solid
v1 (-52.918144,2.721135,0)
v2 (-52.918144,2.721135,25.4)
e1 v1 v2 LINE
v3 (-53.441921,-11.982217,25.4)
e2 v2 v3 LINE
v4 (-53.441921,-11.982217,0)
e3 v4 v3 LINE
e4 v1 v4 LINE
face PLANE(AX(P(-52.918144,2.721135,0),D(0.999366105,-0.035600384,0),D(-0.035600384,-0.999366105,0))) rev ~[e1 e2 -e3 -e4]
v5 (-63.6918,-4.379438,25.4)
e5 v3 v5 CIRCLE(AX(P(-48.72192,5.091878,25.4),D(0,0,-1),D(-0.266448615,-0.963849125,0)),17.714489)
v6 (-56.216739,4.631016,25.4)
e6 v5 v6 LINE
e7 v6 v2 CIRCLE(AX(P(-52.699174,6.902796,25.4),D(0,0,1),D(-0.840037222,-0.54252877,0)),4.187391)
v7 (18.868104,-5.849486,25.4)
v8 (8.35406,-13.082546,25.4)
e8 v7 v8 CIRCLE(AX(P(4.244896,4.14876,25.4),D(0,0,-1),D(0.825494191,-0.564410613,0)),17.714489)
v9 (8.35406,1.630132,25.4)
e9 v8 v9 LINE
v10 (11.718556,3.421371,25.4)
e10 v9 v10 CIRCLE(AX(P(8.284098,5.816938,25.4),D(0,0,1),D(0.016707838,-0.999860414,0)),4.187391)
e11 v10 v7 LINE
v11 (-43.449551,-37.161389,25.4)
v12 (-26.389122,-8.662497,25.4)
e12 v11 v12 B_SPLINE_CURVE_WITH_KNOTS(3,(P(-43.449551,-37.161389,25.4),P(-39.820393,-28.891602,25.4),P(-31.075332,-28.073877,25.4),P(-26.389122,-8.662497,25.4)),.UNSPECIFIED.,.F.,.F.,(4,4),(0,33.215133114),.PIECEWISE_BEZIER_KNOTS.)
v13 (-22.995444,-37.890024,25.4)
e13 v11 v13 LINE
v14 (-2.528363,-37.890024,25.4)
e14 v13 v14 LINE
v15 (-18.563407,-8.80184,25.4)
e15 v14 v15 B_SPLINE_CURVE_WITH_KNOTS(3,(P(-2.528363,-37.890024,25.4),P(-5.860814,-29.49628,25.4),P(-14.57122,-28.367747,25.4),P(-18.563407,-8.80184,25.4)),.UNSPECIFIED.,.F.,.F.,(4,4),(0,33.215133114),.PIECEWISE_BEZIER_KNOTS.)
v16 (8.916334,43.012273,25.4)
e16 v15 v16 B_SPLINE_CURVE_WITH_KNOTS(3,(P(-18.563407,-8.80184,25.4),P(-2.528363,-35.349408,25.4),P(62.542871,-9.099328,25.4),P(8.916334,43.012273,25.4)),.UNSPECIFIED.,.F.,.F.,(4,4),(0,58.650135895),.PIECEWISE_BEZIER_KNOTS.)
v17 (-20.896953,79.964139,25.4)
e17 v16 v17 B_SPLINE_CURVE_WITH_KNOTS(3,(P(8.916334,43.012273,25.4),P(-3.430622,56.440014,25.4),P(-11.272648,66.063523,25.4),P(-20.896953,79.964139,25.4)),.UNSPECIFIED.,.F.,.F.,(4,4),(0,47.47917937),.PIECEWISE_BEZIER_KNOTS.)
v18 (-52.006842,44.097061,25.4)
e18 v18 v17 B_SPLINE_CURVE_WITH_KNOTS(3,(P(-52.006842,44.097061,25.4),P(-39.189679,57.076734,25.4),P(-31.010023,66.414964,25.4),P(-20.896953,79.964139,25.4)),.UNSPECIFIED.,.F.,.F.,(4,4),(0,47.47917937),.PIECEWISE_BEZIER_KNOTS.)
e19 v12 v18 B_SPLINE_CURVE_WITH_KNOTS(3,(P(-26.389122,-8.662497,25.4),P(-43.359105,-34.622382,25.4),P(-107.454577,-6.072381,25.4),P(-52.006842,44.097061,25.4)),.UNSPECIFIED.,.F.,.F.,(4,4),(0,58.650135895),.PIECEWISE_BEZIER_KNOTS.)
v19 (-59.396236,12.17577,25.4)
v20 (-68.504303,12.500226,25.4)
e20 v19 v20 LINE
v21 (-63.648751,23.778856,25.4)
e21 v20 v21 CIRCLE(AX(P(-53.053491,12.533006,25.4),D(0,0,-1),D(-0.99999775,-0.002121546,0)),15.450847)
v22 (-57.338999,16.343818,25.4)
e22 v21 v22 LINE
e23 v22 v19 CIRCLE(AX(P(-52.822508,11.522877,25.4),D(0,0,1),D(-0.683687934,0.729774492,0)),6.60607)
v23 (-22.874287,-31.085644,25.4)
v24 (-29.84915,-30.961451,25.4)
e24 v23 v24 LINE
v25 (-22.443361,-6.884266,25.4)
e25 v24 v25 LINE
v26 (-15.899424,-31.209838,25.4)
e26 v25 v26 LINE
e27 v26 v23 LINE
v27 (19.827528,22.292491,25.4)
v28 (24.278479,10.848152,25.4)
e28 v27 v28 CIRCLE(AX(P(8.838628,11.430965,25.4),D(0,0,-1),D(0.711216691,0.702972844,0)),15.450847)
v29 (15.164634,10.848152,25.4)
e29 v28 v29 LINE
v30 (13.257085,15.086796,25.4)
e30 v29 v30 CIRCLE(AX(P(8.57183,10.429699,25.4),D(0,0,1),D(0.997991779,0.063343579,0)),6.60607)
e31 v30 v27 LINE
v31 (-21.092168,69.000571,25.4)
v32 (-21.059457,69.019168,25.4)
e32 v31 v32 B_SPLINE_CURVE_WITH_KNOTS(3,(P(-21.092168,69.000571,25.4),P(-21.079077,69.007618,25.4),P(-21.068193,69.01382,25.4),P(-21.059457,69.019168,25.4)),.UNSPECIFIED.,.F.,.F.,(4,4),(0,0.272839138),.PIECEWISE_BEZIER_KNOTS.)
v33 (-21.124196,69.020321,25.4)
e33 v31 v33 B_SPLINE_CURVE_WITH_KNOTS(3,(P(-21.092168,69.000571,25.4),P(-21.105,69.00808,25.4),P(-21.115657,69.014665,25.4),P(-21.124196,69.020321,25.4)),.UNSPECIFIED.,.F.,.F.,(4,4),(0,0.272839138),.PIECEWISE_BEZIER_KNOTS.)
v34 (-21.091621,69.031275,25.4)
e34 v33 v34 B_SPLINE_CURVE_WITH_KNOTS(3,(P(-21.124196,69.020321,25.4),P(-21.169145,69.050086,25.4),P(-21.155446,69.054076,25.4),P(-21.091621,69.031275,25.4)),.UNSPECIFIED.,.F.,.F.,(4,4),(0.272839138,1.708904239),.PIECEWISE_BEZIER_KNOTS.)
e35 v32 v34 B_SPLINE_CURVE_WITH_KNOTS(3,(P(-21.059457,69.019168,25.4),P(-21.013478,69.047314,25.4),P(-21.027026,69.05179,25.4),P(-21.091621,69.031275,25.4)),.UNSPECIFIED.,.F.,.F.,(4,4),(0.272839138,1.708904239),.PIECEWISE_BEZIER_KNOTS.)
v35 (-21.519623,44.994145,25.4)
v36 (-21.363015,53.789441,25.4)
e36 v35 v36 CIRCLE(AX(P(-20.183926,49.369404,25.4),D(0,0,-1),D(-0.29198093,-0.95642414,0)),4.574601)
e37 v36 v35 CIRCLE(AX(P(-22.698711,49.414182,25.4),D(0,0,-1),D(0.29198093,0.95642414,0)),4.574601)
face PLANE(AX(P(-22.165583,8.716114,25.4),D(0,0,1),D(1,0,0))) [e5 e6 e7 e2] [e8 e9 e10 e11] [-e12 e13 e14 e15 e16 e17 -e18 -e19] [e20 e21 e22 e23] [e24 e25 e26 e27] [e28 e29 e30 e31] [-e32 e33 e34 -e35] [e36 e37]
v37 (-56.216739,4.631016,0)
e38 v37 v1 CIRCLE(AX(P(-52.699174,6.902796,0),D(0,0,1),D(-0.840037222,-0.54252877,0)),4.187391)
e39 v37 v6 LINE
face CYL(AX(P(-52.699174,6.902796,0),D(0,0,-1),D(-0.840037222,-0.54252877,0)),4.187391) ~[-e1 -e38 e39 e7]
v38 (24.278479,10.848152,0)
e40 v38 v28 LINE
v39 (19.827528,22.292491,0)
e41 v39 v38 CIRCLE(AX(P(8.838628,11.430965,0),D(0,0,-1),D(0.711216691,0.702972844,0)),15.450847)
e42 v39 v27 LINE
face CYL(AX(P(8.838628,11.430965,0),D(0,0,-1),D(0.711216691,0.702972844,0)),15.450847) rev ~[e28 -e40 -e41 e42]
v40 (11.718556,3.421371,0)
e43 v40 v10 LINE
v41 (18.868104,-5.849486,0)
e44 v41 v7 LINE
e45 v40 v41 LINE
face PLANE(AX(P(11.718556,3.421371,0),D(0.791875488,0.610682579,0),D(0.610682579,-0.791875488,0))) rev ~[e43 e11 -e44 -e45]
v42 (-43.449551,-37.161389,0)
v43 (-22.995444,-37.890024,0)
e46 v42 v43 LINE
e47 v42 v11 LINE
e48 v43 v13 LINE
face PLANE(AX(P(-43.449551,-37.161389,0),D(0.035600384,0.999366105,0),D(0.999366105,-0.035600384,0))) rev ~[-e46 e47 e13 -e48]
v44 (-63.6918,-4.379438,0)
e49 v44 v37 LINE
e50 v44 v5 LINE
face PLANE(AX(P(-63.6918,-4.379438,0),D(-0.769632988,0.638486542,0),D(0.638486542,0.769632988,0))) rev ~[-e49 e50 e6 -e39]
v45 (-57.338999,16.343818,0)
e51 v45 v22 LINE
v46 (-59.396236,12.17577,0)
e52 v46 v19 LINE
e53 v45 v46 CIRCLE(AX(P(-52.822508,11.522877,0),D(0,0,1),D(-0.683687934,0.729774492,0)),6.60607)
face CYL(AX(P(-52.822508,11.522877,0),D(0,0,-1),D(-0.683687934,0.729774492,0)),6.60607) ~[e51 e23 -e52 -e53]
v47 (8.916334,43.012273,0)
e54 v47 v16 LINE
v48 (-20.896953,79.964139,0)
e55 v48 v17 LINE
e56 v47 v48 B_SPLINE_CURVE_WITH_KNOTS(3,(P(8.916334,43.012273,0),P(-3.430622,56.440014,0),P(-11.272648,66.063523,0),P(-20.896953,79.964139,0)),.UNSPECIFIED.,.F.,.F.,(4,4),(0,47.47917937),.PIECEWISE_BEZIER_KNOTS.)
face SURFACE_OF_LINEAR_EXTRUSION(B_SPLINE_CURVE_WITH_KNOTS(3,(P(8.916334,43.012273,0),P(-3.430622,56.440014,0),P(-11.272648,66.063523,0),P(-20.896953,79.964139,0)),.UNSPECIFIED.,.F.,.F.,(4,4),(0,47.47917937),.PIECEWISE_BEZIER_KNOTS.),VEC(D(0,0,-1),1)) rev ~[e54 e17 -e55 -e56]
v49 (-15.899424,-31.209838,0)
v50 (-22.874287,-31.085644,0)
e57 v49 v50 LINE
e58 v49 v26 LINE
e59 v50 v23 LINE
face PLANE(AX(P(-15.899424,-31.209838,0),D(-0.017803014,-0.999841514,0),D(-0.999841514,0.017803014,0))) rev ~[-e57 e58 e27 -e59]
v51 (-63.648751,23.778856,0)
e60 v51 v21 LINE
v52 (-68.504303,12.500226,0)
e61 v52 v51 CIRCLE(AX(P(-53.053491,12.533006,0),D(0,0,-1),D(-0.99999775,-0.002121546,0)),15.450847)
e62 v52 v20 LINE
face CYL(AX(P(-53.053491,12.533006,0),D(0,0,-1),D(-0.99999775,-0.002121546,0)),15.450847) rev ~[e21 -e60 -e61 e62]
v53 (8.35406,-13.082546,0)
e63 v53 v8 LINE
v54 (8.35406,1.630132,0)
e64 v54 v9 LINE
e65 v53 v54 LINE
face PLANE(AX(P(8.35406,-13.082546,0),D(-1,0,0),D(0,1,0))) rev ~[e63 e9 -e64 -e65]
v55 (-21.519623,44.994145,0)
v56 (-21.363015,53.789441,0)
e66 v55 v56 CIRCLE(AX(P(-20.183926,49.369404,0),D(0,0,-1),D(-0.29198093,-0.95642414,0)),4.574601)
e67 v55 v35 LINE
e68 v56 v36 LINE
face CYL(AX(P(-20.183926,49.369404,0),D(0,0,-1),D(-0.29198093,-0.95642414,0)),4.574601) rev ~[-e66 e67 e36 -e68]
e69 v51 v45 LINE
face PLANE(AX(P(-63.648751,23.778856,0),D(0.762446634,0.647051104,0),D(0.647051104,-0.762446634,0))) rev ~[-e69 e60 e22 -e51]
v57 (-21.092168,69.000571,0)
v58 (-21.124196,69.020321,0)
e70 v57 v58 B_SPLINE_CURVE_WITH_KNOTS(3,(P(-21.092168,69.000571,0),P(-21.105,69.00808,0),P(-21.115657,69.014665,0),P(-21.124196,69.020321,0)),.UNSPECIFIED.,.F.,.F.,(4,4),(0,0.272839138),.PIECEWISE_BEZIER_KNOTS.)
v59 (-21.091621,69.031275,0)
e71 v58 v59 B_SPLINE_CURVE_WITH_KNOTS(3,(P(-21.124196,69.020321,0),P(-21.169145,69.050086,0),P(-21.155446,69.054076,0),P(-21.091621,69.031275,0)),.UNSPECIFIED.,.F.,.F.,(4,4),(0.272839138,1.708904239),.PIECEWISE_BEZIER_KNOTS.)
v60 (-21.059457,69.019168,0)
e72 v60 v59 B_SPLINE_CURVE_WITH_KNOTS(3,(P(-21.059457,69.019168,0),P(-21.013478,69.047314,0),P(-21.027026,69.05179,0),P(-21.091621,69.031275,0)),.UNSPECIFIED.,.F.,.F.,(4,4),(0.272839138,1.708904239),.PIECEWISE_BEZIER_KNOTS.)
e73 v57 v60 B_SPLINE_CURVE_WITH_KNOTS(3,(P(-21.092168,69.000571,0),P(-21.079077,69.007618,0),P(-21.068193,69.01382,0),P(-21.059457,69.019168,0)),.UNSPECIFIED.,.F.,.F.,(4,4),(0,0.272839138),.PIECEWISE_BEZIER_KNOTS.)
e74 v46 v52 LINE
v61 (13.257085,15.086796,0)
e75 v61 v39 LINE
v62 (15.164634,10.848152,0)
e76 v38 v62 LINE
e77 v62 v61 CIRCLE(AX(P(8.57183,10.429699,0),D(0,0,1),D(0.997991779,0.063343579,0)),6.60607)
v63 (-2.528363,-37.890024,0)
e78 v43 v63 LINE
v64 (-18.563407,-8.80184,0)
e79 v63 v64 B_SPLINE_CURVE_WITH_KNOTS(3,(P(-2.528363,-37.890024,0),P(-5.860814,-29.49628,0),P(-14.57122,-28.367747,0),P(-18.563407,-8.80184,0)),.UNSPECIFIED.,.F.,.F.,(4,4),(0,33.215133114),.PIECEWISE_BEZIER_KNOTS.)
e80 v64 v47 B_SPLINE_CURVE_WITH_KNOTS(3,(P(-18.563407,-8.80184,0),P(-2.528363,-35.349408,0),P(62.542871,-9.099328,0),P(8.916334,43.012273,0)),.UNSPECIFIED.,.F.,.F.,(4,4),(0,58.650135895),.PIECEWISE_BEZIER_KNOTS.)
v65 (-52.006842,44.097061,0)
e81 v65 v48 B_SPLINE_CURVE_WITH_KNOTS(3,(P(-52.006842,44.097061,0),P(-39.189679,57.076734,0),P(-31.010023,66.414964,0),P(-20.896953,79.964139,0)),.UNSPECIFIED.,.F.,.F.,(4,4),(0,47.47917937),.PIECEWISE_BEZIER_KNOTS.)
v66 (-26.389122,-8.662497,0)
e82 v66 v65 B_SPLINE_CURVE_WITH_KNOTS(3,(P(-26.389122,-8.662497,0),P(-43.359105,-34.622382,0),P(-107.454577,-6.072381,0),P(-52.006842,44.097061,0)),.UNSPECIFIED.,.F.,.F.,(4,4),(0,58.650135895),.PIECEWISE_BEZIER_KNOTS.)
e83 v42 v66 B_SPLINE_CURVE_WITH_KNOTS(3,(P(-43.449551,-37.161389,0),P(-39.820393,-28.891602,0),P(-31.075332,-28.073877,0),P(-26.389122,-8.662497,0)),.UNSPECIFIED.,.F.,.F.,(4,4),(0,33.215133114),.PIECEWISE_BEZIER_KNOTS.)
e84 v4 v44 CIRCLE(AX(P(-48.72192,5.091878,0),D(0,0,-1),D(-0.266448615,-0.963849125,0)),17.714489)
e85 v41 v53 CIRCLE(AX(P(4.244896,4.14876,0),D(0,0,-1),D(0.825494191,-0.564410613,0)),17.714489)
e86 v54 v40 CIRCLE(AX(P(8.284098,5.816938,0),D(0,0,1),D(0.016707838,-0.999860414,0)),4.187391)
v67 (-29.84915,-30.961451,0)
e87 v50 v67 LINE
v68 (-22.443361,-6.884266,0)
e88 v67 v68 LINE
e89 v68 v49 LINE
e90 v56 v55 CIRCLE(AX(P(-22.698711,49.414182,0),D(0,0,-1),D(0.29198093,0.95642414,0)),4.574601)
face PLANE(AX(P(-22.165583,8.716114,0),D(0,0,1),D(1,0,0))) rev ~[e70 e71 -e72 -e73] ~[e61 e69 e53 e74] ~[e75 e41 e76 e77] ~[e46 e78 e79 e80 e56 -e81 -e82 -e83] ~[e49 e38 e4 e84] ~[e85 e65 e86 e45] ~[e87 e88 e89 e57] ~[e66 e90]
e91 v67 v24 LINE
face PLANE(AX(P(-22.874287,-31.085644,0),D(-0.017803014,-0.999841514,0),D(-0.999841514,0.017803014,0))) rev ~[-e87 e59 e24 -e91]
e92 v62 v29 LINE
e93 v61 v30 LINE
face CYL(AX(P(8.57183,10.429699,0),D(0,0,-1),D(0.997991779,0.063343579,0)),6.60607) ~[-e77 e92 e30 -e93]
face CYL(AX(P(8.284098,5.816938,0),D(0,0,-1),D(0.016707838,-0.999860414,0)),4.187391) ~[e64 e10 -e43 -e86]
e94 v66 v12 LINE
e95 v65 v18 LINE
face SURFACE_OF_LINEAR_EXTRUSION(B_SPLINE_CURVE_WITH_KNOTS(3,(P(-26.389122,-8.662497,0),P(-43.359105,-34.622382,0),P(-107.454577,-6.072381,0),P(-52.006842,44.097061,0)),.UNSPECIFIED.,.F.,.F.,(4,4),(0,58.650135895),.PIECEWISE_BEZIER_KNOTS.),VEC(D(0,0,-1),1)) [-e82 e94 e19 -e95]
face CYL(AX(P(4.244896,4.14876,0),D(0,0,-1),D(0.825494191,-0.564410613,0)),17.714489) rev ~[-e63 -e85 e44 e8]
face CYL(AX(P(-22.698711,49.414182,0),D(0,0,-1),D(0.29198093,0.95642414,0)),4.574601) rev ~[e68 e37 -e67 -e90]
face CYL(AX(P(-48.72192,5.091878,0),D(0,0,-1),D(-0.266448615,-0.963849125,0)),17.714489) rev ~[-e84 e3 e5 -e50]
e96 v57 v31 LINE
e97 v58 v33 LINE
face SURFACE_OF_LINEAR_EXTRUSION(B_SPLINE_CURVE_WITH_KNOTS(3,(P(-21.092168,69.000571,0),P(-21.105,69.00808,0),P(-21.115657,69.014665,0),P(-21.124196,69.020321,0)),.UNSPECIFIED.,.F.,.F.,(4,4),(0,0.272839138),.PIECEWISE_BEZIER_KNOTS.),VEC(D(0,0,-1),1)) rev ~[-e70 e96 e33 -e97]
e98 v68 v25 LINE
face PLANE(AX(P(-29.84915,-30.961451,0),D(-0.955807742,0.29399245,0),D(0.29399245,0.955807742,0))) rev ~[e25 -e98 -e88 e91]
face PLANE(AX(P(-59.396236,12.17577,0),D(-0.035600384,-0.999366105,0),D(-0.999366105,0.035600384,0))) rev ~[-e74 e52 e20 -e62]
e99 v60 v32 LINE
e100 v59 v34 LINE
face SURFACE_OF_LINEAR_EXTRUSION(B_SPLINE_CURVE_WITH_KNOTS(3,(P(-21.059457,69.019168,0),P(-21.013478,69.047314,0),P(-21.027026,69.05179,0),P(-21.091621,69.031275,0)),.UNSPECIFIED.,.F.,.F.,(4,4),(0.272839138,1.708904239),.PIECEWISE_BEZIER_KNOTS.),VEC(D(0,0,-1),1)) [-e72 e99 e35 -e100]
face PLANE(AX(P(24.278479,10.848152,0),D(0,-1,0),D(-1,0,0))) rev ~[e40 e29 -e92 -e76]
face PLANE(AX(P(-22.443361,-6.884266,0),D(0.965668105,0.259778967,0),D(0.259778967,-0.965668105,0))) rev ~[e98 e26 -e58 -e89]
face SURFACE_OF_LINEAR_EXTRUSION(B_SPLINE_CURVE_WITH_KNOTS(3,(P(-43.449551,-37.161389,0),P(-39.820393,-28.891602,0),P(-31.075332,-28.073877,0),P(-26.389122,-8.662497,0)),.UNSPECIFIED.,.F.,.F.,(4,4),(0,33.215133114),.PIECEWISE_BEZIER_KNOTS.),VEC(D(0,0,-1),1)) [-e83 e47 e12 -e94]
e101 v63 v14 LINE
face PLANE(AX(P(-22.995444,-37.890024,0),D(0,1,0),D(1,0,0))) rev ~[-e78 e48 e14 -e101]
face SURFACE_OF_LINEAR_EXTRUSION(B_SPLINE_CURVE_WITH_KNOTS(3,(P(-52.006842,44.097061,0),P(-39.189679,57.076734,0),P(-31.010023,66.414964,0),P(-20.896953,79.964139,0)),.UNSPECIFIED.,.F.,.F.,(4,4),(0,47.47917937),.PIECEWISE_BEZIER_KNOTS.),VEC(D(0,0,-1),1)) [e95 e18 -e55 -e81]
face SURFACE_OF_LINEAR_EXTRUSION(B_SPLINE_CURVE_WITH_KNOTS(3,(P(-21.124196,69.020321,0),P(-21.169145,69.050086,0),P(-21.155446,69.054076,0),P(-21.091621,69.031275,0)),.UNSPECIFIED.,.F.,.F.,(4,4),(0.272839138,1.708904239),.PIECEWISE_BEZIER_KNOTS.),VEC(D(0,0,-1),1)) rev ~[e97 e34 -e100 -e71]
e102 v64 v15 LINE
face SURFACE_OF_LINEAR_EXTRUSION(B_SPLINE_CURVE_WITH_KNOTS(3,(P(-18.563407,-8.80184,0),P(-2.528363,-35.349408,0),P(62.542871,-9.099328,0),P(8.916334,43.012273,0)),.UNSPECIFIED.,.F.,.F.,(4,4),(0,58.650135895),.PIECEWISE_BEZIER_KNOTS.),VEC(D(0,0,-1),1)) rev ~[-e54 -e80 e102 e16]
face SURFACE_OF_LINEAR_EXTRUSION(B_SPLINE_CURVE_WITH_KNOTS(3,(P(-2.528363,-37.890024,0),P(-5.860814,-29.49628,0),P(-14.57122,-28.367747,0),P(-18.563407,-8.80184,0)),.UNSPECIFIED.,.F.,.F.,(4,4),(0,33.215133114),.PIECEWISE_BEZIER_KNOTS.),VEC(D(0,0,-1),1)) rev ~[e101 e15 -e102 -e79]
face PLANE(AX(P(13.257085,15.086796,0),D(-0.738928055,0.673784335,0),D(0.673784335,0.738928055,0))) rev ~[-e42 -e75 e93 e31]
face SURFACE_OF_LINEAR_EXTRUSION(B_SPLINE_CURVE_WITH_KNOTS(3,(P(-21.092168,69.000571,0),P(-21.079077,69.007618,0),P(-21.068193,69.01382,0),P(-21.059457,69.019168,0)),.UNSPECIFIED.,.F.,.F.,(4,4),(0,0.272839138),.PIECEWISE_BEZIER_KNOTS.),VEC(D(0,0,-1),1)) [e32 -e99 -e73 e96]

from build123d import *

# Parameters (mm, degrees)
F0_W     = 4.7442697883
F0_H     = 1.9113573674
F0_W_2   = 4.7634891234
F0_H_2   = 1.468620263
F0_W_3   = 4.128358094
F0_H_3   = 1.4289282262
F1_DEPTH = 25.4


# Not quite as in the source:
# - a feature names something its author has since deleted; it is built from what else it names


with BuildPart() as f1:
    # F0 (on Top) → F1 (new body)
    with BuildSketch(Plane.XY):
        with BuildLine():
            Line((-22.9954444695, -37.8900244832), (-2.5283634938, -37.8900244832))
            add(Edge.make_bspline(
                [(-2.5283634938, -37.8900244832), (-5.8608135484, -29.4962804765), (-14.5712196827, -28.3677466214), (-18.5634065419, -8.8018402457)],
                knots=[0, 0, 0, 0, 33.2151331141, 33.2151331141, 33.2151331141, 33.2151331141], degree=3))
            add(Edge.make_bspline(
                [(-18.5634065419, -8.8018402457), (-2.5283634938, -35.3494078415), (62.5428706408, -9.0993279591), (8.9163342491, 43.0122725666)],
                knots=[0, 0, 0, 0, 58.6501358947, 58.6501358947, 58.6501358947, 58.6501358947], degree=3))
            add(Edge.make_bspline(
                [(8.9163342491, 43.0122725666), (-3.4306221642, 56.4400143921), (-11.2726483494, 66.0635232925), (-20.8969525993, 79.9641385674)],
                knots=[0, 0, 0, 0, 47.47917937, 47.47917937, 47.47917937, 47.47917937], degree=3))
            add(Edge.make_bspline(
                [(-52.0068416032, 44.0970606294), (-39.1896790872, 57.0767342864), (-31.0100233031, 66.4149637492), (-20.8969525993, 79.9641385674)],
                knots=[0, 0, 0, 0, 47.47917937, 47.47917937, 47.47917937, 47.47917937], degree=3))
            add(Edge.make_bspline(
                [(-26.3891224094, -8.6624968343), (-43.3591045439, -34.6223823726), (-107.454577438, -6.07238132), (-52.0068416032, 44.0970606294)],
                knots=[0, 0, 0, 0, 58.6501358947, 58.6501358947, 58.6501358947, 58.6501358947], degree=3))
            add(Edge.make_bspline(
                [(-43.4495514732, -37.1613885312), (-39.8203933268, -28.8916017766), (-31.0753324327, -28.0738771005), (-26.3891224094, -8.6624968343)],
                knots=[0, 0, 0, 0, 33.2151331141, 33.2151331141, 33.2151331141, 33.2151331141], degree=3))
            Line((-43.4495514732, -37.1613885312), (-22.9954444695, -37.8900244832))
        make_face()
        Polygon((-29.84915008, -30.9614511052), (-22.4433610347, -6.8842664576), (-15.8994235098, -31.2098376453), (-22.8742867949, -31.0856443752), align=None, mode=Mode.SUBTRACT)
        with BuildLine():
            add(Edge.make_bspline(
                [(-22.3207809169, 0), (-10.655029352, -32.6894562044), (59.6865899861, -11.1531224102), (7.7575119212, 41.9883653522)],
                knots=[0, 0, 0, 0, 51.6500389642, 51.6500389642, 51.6500389642, 51.6500389642], degree=3))
            add(Edge.make_bspline(
                [(-22.3207809169, 0), (-35.1428948343, -32.2534292936), (-104.6732232363, -8.2265585713), (-50.8852053371, 43.0325479438)],
                knots=[0, 0, 0, 0, 51.6500389642, 51.6500389642, 51.6500389642, 51.6500389642], degree=3))
            Line((-50.8852053371, 43.0325479438), (-20.973111277, 75.6869634445))
            Line((-20.973111277, 75.6869634445), (7.7575119212, 41.9883653522))
        make_face(mode=Mode.SUBTRACT)
        with BuildLine():
            add(Edge.make_bspline(
                [(-22.3207809169, 0), (-35.1428948343, -32.2534292936), (-104.6732232363, -8.2265585713), (-50.8852053371, 43.0325479438)],
                knots=[0, 0, 0, 0, 51.6500389642, 51.6500389642, 51.6500389642, 51.6500389642], degree=3))
            add(Edge.make_bspline(
                [(-22.3207809169, 0), (-10.655029352, -32.6894562044), (59.6865899861, -11.1531224102), (7.7575119212, 41.9883653522)],
                knots=[0, 0, 0, 0, 51.6500389642, 51.6500389642, 51.6500389642, 51.6500389642], degree=3))
            Line((7.7575119212, 41.9883653522), (-20.973111277, 75.6869634445))
            Line((-20.973111277, 75.6869634445), (-50.8852053371, 43.0325479438))
        make_face()
        with BuildLine():
            ThreePointArc((-53.4419212435, -11.9822170834), (-59.2752805035, -9.1359017891), (-63.691800004, -4.379438133))
            Line((-63.691800004, -4.379438133), (-56.2167386264, 4.6310161836))
            ThreePointArc((-56.2167386264, 4.6310161836), (-54.7973483092, 3.2789986514), (-52.9181442541, 2.7211345107))
            Line((-52.9181442541, 2.7211345107), (-53.4419212435, -11.9822170834))
        make_face(mode=Mode.SUBTRACT)
        with BuildLine():
            Line((-59.3962358793, 12.1757701265), (-68.5043031466, 12.5002264942))
            ThreePointArc((-68.5043031466, 12.5002264942), (-67.2450849294, 18.6426159936), (-63.6487509213, 23.7788559591))
            Line((-63.6487509213, 23.7788559591), (-57.3389988191, 16.3438184143))
            ThreePointArc((-57.3389988191, 16.3438184143), (-58.7463070002, 14.4467053449), (-59.3962358793, 12.1757701265))
        make_face(mode=Mode.SUBTRACT)
        with BuildLine():
            ThreePointArc((18.8681036234, -5.8494862169), (14.2850517957, -10.4457049841), (8.3540603518, -13.082546182))
            Line((8.3540603518, -13.082546182), (8.3540603518, 1.6301316991))
            ThreePointArc((8.3540603518, 1.6301316991), (10.2519333675, 2.1207418259), (11.7185562849, 3.4213714805))
            Line((11.7185562849, 3.4213714805), (18.8681036234, -5.8494862169))
        make_face(mode=Mode.SUBTRACT)
        with BuildLine():
            ThreePointArc((19.8275279254, 22.2924910486), (23.2387301192, 17.0314760444), (24.2784786969, 10.8481515199))
            Line((24.2784786969, 10.8481515199), (15.1646342129, 10.8481515199))
            ThreePointArc((15.1646342129, 10.8481515199), (14.5959634871, 13.1407849228), (13.2570853457, 15.0867961347))
            Line((13.2570853457, 15.0867961347), (19.8275279254, 22.2924910486))
        make_face(mode=Mode.SUBTRACT)
        with BuildLine():
            add(Edge.make_bspline(
                [(-21.124196495, 69.0203205478), (-22.2645987992, 68.6191021406), (-33.580908588, 63.0681711425), (-30.2861785142, 48.5103170354)],
                knots=[1.924853553, 1.924853553, 1.924853553, 1.924853553, 22.4584134886, 22.4584134886, 22.4584134886, 22.4584134886], degree=3))
            add(Edge.make_bspline(
                [(-21.124196495, 69.0203205478), (-21.1691445632, 69.0500857695), (-21.1554459369, 69.0540761805), (-21.0916213723, 69.0312749979)],
                knots=[0.2728391378, 0.2728391378, 0.2728391378, 0.2728391378, 1.7089042388, 1.7089042388, 1.7089042388, 1.7089042388], degree=3))
            add(Edge.make_bspline(
                [(-21.0594568815, 69.0191678049), (-21.0134776523, 69.04731399), (-21.027025535, 69.0517895479), (-21.0916213723, 69.0312749979)],
                knots=[0.2728391378, 0.2728391378, 0.2728391378, 0.2728391378, 1.7089042388, 1.7089042388, 1.7089042388, 1.7089042388], degree=3))
            add(Edge.make_bspline(
                [(-21.0594568815, 69.0191678049), (-19.9340610017, 68.5776049674), (-8.8225398383, 62.627327695), (-12.633446604, 48.1959953904)],
                knots=[1.924853553, 1.924853553, 1.924853553, 1.924853553, 22.4584134886, 22.4584134886, 22.4584134886, 22.4584134886], degree=3))
            add(Edge.make_bspline(
                [(-12.633446604, 48.1959953904), (-4.4782049954, 44.5908084512), (-1.012446126, 42.8227111697), (4.8599806614, 35.9290093184)],
                knots=[0, 0, 0, 0, 21.3658359252, 21.3658359252, 21.3658359252, 21.3658359252], degree=3))
            Line((4.8599806614, 35.9290093184), (8.7451650402, 35.4348045049))
            Line((8.7451650402, 35.4348045049), (12.5032669737, 31.2499941052))
            add(Edge.make_bspline(
                [(12.5032669737, 31.2499941052), (8.0707731529, 17.1092335792), (6.1978180893, 11.1496476457), (4.9289693125, -2.2719807457)],
                knots=[0, 0, 0, 0, 34.3670304648, 34.3670304648, 34.3670304648, 34.3670304648], degree=3))
            Line((4.9289693125, -2.2719807457), (-17.9089047015, -2.2719807457))
            Line((-17.9089047015, -2.2719807457), (-22.3005021556, 1.1388828675))
            Line((-22.3005021556, 1.1388828675), (-26.8107438558, -2.1134760598))
            Line((-26.8107438558, -2.1134760598), (-49.6341410648, -1.3004389641))
            add(Edge.make_bspline(
                [(-56.0102422262, 32.469934397), (-52.083974651, 18.1803391384), (-50.4243703941, 12.1578530338), (-49.6341410648, -1.3004389641)],
                knots=[0, 0, 0, 0, 34.3670304648, 34.3670304648, 34.3670304648, 34.3670304648], degree=3))
            Line((-56.0102422262, 32.469934397), (-52.105541674, 36.5183021942))
            Line((-52.105541674, 36.5183021942), (-48.2052262113, 36.8738796762))
            add(Edge.make_bspline(
                [(-30.2861785142, 48.5103170354), (-38.5645966004, 45.1977451416), (-42.0911034871, 43.5541509957), (-48.2052262113, 36.8738796762)],
                knots=[0, 0, 0, 0, 21.3658359252, 21.3658359252, 21.3658359252, 21.3658359252], degree=3))
        make_face(mode=Mode.SUBTRACT)
        with BuildLine():
            add(Edge.make_bspline(
                [(-21.0921680822, 69.000571026), (-21.0790768616, 69.0076183464), (-21.0681925114, 69.013820289), (-21.0594568815, 69.0191678049)],
                knots=[0, 0, 0, 0, 0.2728391378, 0.2728391378, 0.2728391378, 0.2728391378], degree=3))
            add(Edge.make_bspline(
                [(-21.0921680822, 69.000571026), (-21.1050001171, 69.0080799317), (-21.1156567762, 69.01466543), (-21.124196495, 69.0203205478)],
                knots=[0, 0, 0, 0, 0.2728391378, 0.2728391378, 0.2728391378, 0.2728391378], degree=3))
            add(Edge.make_bspline(
                [(-21.124196495, 69.0203205478), (-22.2645987992, 68.6191021406), (-33.580908588, 63.0681711425), (-30.2861785142, 48.5103170354)],
                knots=[1.924853553, 1.924853553, 1.924853553, 1.924853553, 22.4584134886, 22.4584134886, 22.4584134886, 22.4584134886], degree=3))
            add(Edge.make_bspline(
                [(-30.2861785142, 48.5103170354), (-38.5645966004, 45.1977451416), (-42.0911034871, 43.5541509957), (-48.2052262113, 36.8738796762)],
                knots=[0, 0, 0, 0, 21.3658359252, 21.3658359252, 21.3658359252, 21.3658359252], degree=3))
            Line((-48.2052262113, 36.8738796762), (-52.105541674, 36.5183021942))
            Line((-52.105541674, 36.5183021942), (-56.0102422262, 32.469934397))
            add(Edge.make_bspline(
                [(-56.0102422262, 32.469934397), (-52.083974651, 18.1803391384), (-50.4243703941, 12.1578530338), (-49.6341410648, -1.3004389641)],
                knots=[0, 0, 0, 0, 34.3670304648, 34.3670304648, 34.3670304648, 34.3670304648], degree=3))
            Line((-49.6341410648, -1.3004389641), (-26.8107438558, -2.1134760598))
            Line((-26.8107438558, -2.1134760598), (-22.3005021556, 1.1388828675))
            Line((-22.3005021556, 1.1388828675), (-17.9089047015, -2.2719807457))
            Line((-17.9089047015, -2.2719807457), (4.9289693125, -2.2719807457))
            add(Edge.make_bspline(
                [(12.5032669737, 31.2499941052), (8.0707731529, 17.1092335792), (6.1978180893, 11.1496476457), (4.9289693125, -2.2719807457)],
                knots=[0, 0, 0, 0, 34.3670304648, 34.3670304648, 34.3670304648, 34.3670304648], degree=3))
            Line((12.5032669737, 31.2499941052), (8.7451650402, 35.4348045049))
            Line((8.7451650402, 35.4348045049), (4.8599806614, 35.9290093184))
            add(Edge.make_bspline(
                [(-12.633446604, 48.1959953904), (-4.4782049954, 44.5908084512), (-1.012446126, 42.8227111697), (4.8599806614, 35.9290093184)],
                knots=[0, 0, 0, 0, 21.3658359252, 21.3658359252, 21.3658359252, 21.3658359252], degree=3))
            add(Edge.make_bspline(
                [(-21.0594568815, 69.0191678049), (-19.9340610017, 68.5776049674), (-8.8225398383, 62.627327695), (-12.633446604, 48.1959953904)],
                knots=[1.924853553, 1.924853553, 1.924853553, 1.924853553, 22.4584134886, 22.4584134886, 22.4584134886, 22.4584134886], degree=3))
        make_face()
        with BuildLine():
            Line((1.5771253966, 0.8908104501), (-22.3005021556, 1.1388828675))
            Line((-22.3005021556, 1.1388828675), (-46.171825282, 1.7410204233))
            add(Edge.make_bspline(
                [(-46.171825282, 1.7410204233), (-45.7708157439, 13.1605637788), (-52.73816584, 22.5929590908), (-52.6217791411, 31.8137129357)],
                knots=[0, 0, 0, 0, 30.7566048147, 30.7566048147, 30.7566048147, 30.7566048147], degree=3))
            Line((-52.6217791411, 31.8137129357), (-47.394574231, 32.6878372218))
            add(Edge.make_bspline(
                [(-47.394574231, 32.6878372218), (-46.4944956501, 34.1402371022), (-39.9368781188, 45.5703020096), (-25.2081565999, 45.257687461)],
                knots=[0, 0, 0, 0, 25.4997698487, 25.4997698487, 25.4997698487, 25.4997698487], degree=3))
            add(Edge.make_bspline(
                [(-25.2081565999, 45.257687461), (-27.3981189013, 47.5347847087), (-28.8692938451, 52.2527268432), (-23.2430618726, 54.7112649227)],
                knots=[0, 0, 0, 0, 9.6556576219, 9.6556576219, 9.6556576219, 9.6556576219], degree=3))
            add(Edge.make_bspline(
                [(-23.2430618726, 54.7112649227), (-23.6007135185, 54.974488922), (-23.6778442933, 55.2155826969), (-23.7461169911, 55.6965485296)],
                knots=[0, 0, 0, 0, 1.1062767458, 1.1062767458, 1.1062767458, 1.1062767458], degree=3))
            Line((-23.7461169911, 55.6965485296), (-26.8019135259, 55.2128791863))
            Line((-26.8019135259, 55.2128791863), (-27.3837317159, 58.8887747819))
            Line((-27.3837317159, 58.8887747819), (-26.355564632, 58.8704674077))
            Line((-26.355564632, 58.8704674077), (-26.287410087, 60.7836866964))
            Line((-26.287410087, 60.7836866964), (-24.6665124446, 60.7548252592))
            Line((-24.6665124446, 60.7548252592), (-24.708365393, 62.4893900249))
            Line((-24.708365393, 62.4893900249), (-23.3507940795, 62.5529359414))
            Line((-23.3507940795, 62.5529359414), (-23.2916032165, 64.2145287318))
            Line((-23.2916032165, 64.2145287318), (-21.1709695666, 64.5749722779))
            Line((-21.1709695666, 64.5749722779), (-19.0645121038, 64.1392618418))
            Line((-19.0645121038, 64.1392618418), (-19.0645121038, 62.4766151085))
            Line((-19.0645121038, 62.4766151085), (-17.7100636065, 62.3647794127))
            Line((-17.7100636065, 62.3647794127), (-17.8136411971, 60.6328041593))
            Line((-17.8136411971, 60.6328041593), (-16.1927435547, 60.6039427221))
            Line((-16.1927435547, 60.6039427221), (-16.1927435547, 58.6895098848))
            Line((-16.1927435547, 58.6895098848), (-15.1645764709, 58.6712025106))
            Line((-15.1645764709, 58.6712025106), (-15.876889146, 55.0183499966))
            Line((-15.876889146, 55.0183499966), (-18.9135298133, 55.6105002761))
            add(Edge.make_bspline(
                [(-19.4513425231, 54.6437501907), (-19.084546715, 54.8940747976), (-18.998881802, 55.1322698593), (-18.9135298133, 55.6105002761)],
                knots=[0, 0, 0, 0, 1.1062767458, 1.1062767458, 1.1062767458, 1.1062767458], degree=3))
            add(Edge.make_bspline(
                [(-17.8240444511, 45.1262071729), (-15.5544048175, 47.323897481), (-13.9162018895, 51.9864745438), (-19.4513425231, 54.6437501907)],
                knots=[0, 0, 0, 0, 9.6556576219, 9.6556576219, 9.6556576219, 9.6556576219], degree=3))
            add(Edge.make_bspline(
                [(3.9008178283, 31.7744798958), (3.0530157965, 33.2580022514), (-3.0935301911, 44.9142754078), (-17.8240444511, 45.1262071729)],
                knots=[0, 0, 0, 0, 25.4997698487, 25.4997698487, 25.4997698487, 25.4997698487], degree=3))
            Line((3.9008178283, 31.7744798958), (9.0935900807, 30.7148192078))
            add(Edge.make_bspline(
                [(1.5771253966, 0.8908104501), (1.5829101903, 12.3173911124), (8.8816406205, 21.4957669377), (9.0935900807, 30.7148192078)],
                knots=[0, 0, 0, 0, 30.7566048147, 30.7566048147, 30.7566048147, 30.7566048147], degree=3))
        make_face(mode=Mode.SUBTRACT)
        with BuildLine():
            Line((-46.171825282, 1.7410204233), (-22.3005021556, 1.1388828675))
            Line((-22.3005021556, 1.1388828675), (1.5771253966, 0.8908104501))
            add(Edge.make_bspline(
                [(1.5771253966, 0.8908104501), (1.5829101903, 12.3173911124), (8.8816406205, 21.4957669377), (9.0935900807, 30.7148192078)],
                knots=[0, 0, 0, 0, 30.7566048147, 30.7566048147, 30.7566048147, 30.7566048147], degree=3))
            Line((9.0935900807, 30.7148192078), (3.9008178283, 31.7744798958))
            add(Edge.make_bspline(
                [(3.9008178283, 31.7744798958), (3.0530157965, 33.2580022514), (-3.0935301911, 44.9142754078), (-17.8240444511, 45.1262071729)],
                knots=[0, 0, 0, 0, 25.4997698487, 25.4997698487, 25.4997698487, 25.4997698487], degree=3))
            add(Edge.make_bspline(
                [(-17.8240444511, 45.1262071729), (-15.5544048175, 47.323897481), (-13.9162018895, 51.9864745438), (-19.4513425231, 54.6437501907)],
                knots=[0, 0, 0, 0, 9.6556576219, 9.6556576219, 9.6556576219, 9.6556576219], degree=3))
            add(Edge.make_bspline(
                [(-19.4513425231, 54.6437501907), (-19.084546715, 54.8940747976), (-18.998881802, 55.1322698593), (-18.9135298133, 55.6105002761)],
                knots=[0, 0, 0, 0, 1.1062767458, 1.1062767458, 1.1062767458, 1.1062767458], degree=3))
            Line((-18.9135298133, 55.6105002761), (-15.876889146, 55.0183499966))
            Line((-15.876889146, 55.0183499966), (-15.1645764709, 58.6712025106))
            Line((-15.1645764709, 58.6712025106), (-16.1927435547, 58.6895098848))
            Line((-16.1927435547, 58.6895098848), (-16.1927435547, 60.6039427221))
            Line((-16.1927435547, 60.6039427221), (-17.8136411971, 60.6328041593))
            Line((-17.8136411971, 60.6328041593), (-17.7100636065, 62.3647794127))
            Line((-17.7100636065, 62.3647794127), (-19.0645121038, 62.4766151085))
            Line((-19.0645121038, 62.4766151085), (-19.0645121038, 64.1392618418))
            Line((-19.0645121038, 64.1392618418), (-21.1709695666, 64.5749722779))
            Line((-21.1709695666, 64.5749722779), (-23.2916032165, 64.2145287318))
            Line((-23.2916032165, 64.2145287318), (-23.3507940795, 62.5529359414))
            Line((-23.3507940795, 62.5529359414), (-24.708365393, 62.4893900249))
            Line((-24.708365393, 62.4893900249), (-24.6665124446, 60.7548252592))
            Line((-24.6665124446, 60.7548252592), (-26.287410087, 60.7836866964))
            Line((-26.287410087, 60.7836866964), (-26.355564632, 58.8704674077))
            Line((-26.355564632, 58.8704674077), (-27.3837317159, 58.8887747819))
            Line((-27.3837317159, 58.8887747819), (-26.8019135259, 55.2128791863))
            Line((-26.8019135259, 55.2128791863), (-23.7461169911, 55.6965485296))
            add(Edge.make_bspline(
                [(-23.2430618726, 54.7112649227), (-23.6007135185, 54.974488922), (-23.6778442933, 55.2155826969), (-23.7461169911, 55.6965485296)],
                knots=[0, 0, 0, 0, 1.1062767458, 1.1062767458, 1.1062767458, 1.1062767458], degree=3))
            add(Edge.make_bspline(
                [(-25.2081565999, 45.257687461), (-27.3981189013, 47.5347847087), (-28.8692938451, 52.2527268432), (-23.2430618726, 54.7112649227)],
                knots=[0, 0, 0, 0, 9.6556576219, 9.6556576219, 9.6556576219, 9.6556576219], degree=3))
            add(Edge.make_bspline(
                [(-47.394574231, 32.6878372218), (-46.4944956501, 34.1402371022), (-39.9368781188, 45.5703020096), (-25.2081565999, 45.257687461)],
                knots=[0, 0, 0, 0, 25.4997698487, 25.4997698487, 25.4997698487, 25.4997698487], degree=3))
            Line((-47.394574231, 32.6878372218), (-52.6217791411, 31.8137129357))
            add(Edge.make_bspline(
                [(-46.171825282, 1.7410204233), (-45.7708157439, 13.1605637788), (-52.73816584, 22.5929590908), (-52.6217791411, 31.8137129357)],
                knots=[0, 0, 0, 0, 30.7566048147, 30.7566048147, 30.7566048147, 30.7566048147], degree=3))
        make_face()
        Polygon((-44.7576590216, 15.5055557954), (-37.679395917, 15.2534070716), (-35.1471528411, 12.5197675079), (-37.679395917, 10.3981904904), (-44.9303970315, 10.6564926543), align=None, mode=Mode.SUBTRACT)
        Polygon((-30.9412721545, 12.0524866506), (-29.4437312744, 13.5210845619), (-27.8865820009, 12.0524866506), (-29.4437312744, 10.525432397), align=None, mode=Mode.SUBTRACT)
        Polygon((-44.3688373522, 8.0533013785), (-22.1914521969, 7.263277148), (0, 7.263277148), (0, 2.287469827), (-22.2800506048, 2.287469827), (-44.5459780059, 3.0806481949), align=None, mode=Mode.SUBTRACT)
        Polygon((-14.8276363188, 10.2651806109), (-16.3294348053, 11.8467019859), (-14.72098995, 13.2589338481), (-13.2766810033, 11.7379538419), align=None, mode=Mode.SUBTRACT)
        Polygon((-9.0568310236, 12.0552075228), (-6.4288745034, 14.6969654201), (0.65387832, 14.6969654201), (0.65387832, 9.8448265344), (-6.6017220804, 9.8448265344), align=None, mode=Mode.SUBTRACT)
        with BuildLine():
            Line((-40.1418328888, 18.7965188536), (-46.5573088461, 19.0250571336))
            ThreePointArc((-46.5573088461, 19.0250571336), (-39.2386461395, 33.6660544705), (-24.1943614945, 40.115172732))
            Line((-24.1943614945, 40.115172732), (-24.3272148478, 32.6539473716))
            Line((-24.3272148478, 32.6539473716), (-26.0486511449, 32.6845989835))
            Line((-26.0486511449, 32.6845989835), (-26.1316949705, 28.0207445723))
            Line((-26.1316949705, 28.0207445723), (-29.55665306, 28.0817288135))
            Line((-29.55665306, 28.0817288135), (-29.6034895982, 25.4513250038))
            Line((-29.6034895982, 25.4513250038), (-29.7527835425, 21.2603784792))
            Line((-29.7527835425, 21.2603784792), (-25.7005311791, 21.1160252323))
            Line((-25.7005311791, 21.1160252323), (-25.7912743076, 18.568704235))
            Line((-25.7912743076, 18.568704235), (-33.0961882413, 17.6953475839))
            Line((-33.0961882413, 17.6953475839), (-35.7368813782, 22.7922350813))
            Line((-35.7368813782, 22.7922350813), (-32.84917873, 25.5710387789))
            Line((-32.84917873, 25.5710387789), (-36.9155790608, 29.7967978759))
            Line((-36.9155790608, 29.7967978759), (-40.934720905, 25.9292229978))
            Line((-40.934720905, 25.9292229978), (-38.0526815829, 22.9342390088))
            Line((-38.0526815829, 22.9342390088), (-40.1418328888, 18.7965188536))
        make_face(mode=Mode.SUBTRACT)
        with BuildLine():
            ThreePointArc((-21.5435338647, 43.6512536062), (-7.2201754113, 40.2072674631), (2.8851975221, 29.4880755246))
            Line((2.8851975221, 29.4880755246), (6.9841672666, 28.7952069193))
            Line((6.9841672666, 28.7952069193), (6.6132862121, 26.9937831908))
            Line((6.6132862121, 26.9937831908), (2.1097264253, 27.6295803487))
            ThreePointArc((2.1097264253, 27.6295803487), (-7.5677131963, 38.4280486782), (-21.5694110126, 42.1979577158))
            ThreePointArc((-21.5694110126, 42.1979577158), (-35.6964434395, 38.9289042288), (-45.7521782087, 28.4818015615))
            Line((-45.7521782087, 28.4818015615), (-50.2755178366, 28.006735892))
            Line((-50.2755178366, 28.006735892), (-50.5820324143, 29.8202212158))
            Line((-50.5820324143, 29.8202212158), (-46.4609945958, 30.3667257165))
            ThreePointArc((-46.4609945958, 30.3667257165), (-35.9804200494, 40.7193676554), (-21.5435338647, 43.6512536062))
        make_face(mode=Mode.SUBTRACT)
        with BuildLine():
            Line((-19.1531257722, 32.5618183913), (-19.0202724189, 40.0230437517))
            ThreePointArc((-19.0202724189, 40.0230437517), (-4.2151153543, 33.0424312338), (2.5776829571, 18.1501675397))
            Line((2.5776829571, 18.1501675397), (-3.8418623153, 18.1501675397))
            Line((-3.8418623153, 18.1501675397), (-5.7823848911, 22.3596394062))
            Line((-5.7823848911, 22.3596394062), (-2.7955498966, 25.250123183))
            Line((-2.7955498966, 25.250123183), (-6.6744568758, 29.2583294213))
            Line((-6.6744568758, 29.2583294213), (-10.888718186, 25.1800144253))
            Line((-10.888718186, 25.1800144253), (-8.101772517, 22.3001688719))
            Line((-8.101772517, 22.3001688719), (-10.9222428873, 17.3005219549))
            Line((-10.9222428873, 17.3005219549), (-18.191434443, 18.4333827347))
            Line((-18.191434443, 18.4333827347), (-18.191434443, 20.9823194891))
            Line((-18.191434443, 20.9823194891), (-14.1366117494, 20.9823194891))
            Line((-14.1366117494, 20.9823194891), (-14.1366117494, 25.1759243172))
            Line((-14.1366117494, 25.1759243172), (-14.0897752112, 27.8063281269))
            Line((-14.0897752112, 27.8063281269), (-17.5147333007, 27.8673123681))
            Line((-17.5147333007, 27.8673123681), (-17.4316894751, 32.5311667793))
            Line((-17.4316894751, 32.5311667793), (-19.1531257722, 32.5618183913))
        make_face(mode=Mode.SUBTRACT)
        with BuildLine():
            ThreePointArc((-21.3630149606, 53.7894412541), (-18.12483498, 49.3327404002), (-21.5196225597, 44.9941450771))
            ThreePointArc((-21.5196225597, 44.9941450771), (-24.7578025403, 49.4508459311), (-21.3630149606, 53.7894412541))
        make_face(mode=Mode.SUBTRACT)
        with BuildLine():
            ThreePointArc((2.5776829571, 18.1501675397), (-4.2151153543, 33.0424312338), (-19.0202724189, 40.0230437517))
            Line((-19.0202724189, 40.0230437517), (-19.1531257722, 32.5618183913))
            Line((-19.1531257722, 32.5618183913), (-17.4316894751, 32.5311667793))
            Line((-17.4316894751, 32.5311667793), (-17.5147333007, 27.8673123681))
            Line((-17.5147333007, 27.8673123681), (-14.0897752112, 27.8063281269))
            Line((-14.0897752112, 27.8063281269), (-14.1366117494, 25.1759243172))
            Line((-14.1366117494, 25.1759243172), (-14.1366117494, 20.9823194891))
            Line((-14.1366117494, 20.9823194891), (-18.191434443, 20.9823194891))
            Line((-18.191434443, 20.9823194891), (-18.191434443, 18.4333827347))
            Line((-18.191434443, 18.4333827347), (-10.9222428873, 17.3005219549))
            Line((-10.9222428873, 17.3005219549), (-8.101772517, 22.3001688719))
            Line((-8.101772517, 22.3001688719), (-10.888718186, 25.1800144253))
            Line((-10.888718186, 25.1800144253), (-6.6744568758, 29.2583294213))
            Line((-6.6744568758, 29.2583294213), (-2.7955498966, 25.250123183))
            Line((-2.7955498966, 25.250123183), (-5.7823848911, 22.3596394062))
            Line((-5.7823848911, 22.3596394062), (-3.8418623153, 18.1501675397))
            Line((-3.8418623153, 18.1501675397), (2.5776829571, 18.1501675397))
        make_face()
        with BuildLine():
            ThreePointArc((-24.1943614945, 40.115172732), (-39.2386461395, 33.6660544705), (-46.5573088461, 19.0250571336))
            Line((-46.5573088461, 19.0250571336), (-40.1418328888, 18.7965188536))
            Line((-40.1418328888, 18.7965188536), (-38.0526815829, 22.9342390088))
            Line((-38.0526815829, 22.9342390088), (-40.934720905, 25.9292229978))
            Line((-40.934720905, 25.9292229978), (-36.9155790608, 29.7967978759))
            Line((-36.9155790608, 29.7967978759), (-32.84917873, 25.5710387789))
            Line((-32.84917873, 25.5710387789), (-35.7368813782, 22.7922350813))
            Line((-35.7368813782, 22.7922350813), (-33.0961882413, 17.6953475839))
            Line((-33.0961882413, 17.6953475839), (-25.7912743076, 18.568704235))
            Line((-25.7912743076, 18.568704235), (-25.7005311791, 21.1160252323))
            Line((-25.7005311791, 21.1160252323), (-29.7527835425, 21.2603784792))
            Line((-29.7527835425, 21.2603784792), (-29.6034895982, 25.4513250038))
            Line((-29.6034895982, 25.4513250038), (-29.55665306, 28.0817288135))
            Line((-29.55665306, 28.0817288135), (-26.1316949705, 28.0207445723))
            Line((-26.1316949705, 28.0207445723), (-26.0486511449, 32.6845989835))
            Line((-26.0486511449, 32.6845989835), (-24.3272148478, 32.6539473716))
            Line((-24.3272148478, 32.6539473716), (-24.1943614945, 40.115172732))
        make_face()
        Polygon((0, 7.263277148), (-22.1914521969, 7.263277148), (-44.3688373522, 8.0533013785), (-44.5459780059, 3.0806481949), (-22.2800506048, 2.287469827), (0, 2.287469827), align=None)
        Polygon((-42.7852563068, 6.1842697226), (-38.6595151567, 6.0372985872), (-38.7103855509, 4.6092761508), (-42.8361267011, 4.7562472863), align=None, mode=Mode.SUBTRACT)
        Polygon((-36.9593330619, 5.8178623416), (-32.1988634885, 5.6482802973), (-32.2511469345, 4.1805909847), (-37.011616508, 4.350173029), align=None, mode=Mode.SUBTRACT)
        Polygon((-30.0360304476, 5.6109514494), (-25.2947680263, 5.4420536208), (-25.3628130835, 3.5319078526), (-30.1040755048, 3.7008056811), align=None, mode=Mode.SUBTRACT)
        with Locations((-16.7828049063, 4.3770501642)):
            Rectangle(F0_W, F0_H, mode=Mode.SUBTRACT)
        with Locations((-9.8661344964, 4.5587262139)):
            Rectangle(F0_W_2, F0_H_2, mode=Mode.SUBTRACT)
        with Locations((-3.7132945145, 4.7373422422)):
            Rectangle(F0_W_3, F0_H_3, mode=Mode.SUBTRACT)
        with BuildLine():
            Line((6.9841672666, 28.7952069193), (2.8851975221, 29.4880755246))
            ThreePointArc((2.8851975221, 29.4880755246), (-7.2201754113, 40.2072674631), (-21.5435338647, 43.6512536062))
            ThreePointArc((-21.5435338647, 43.6512536062), (-35.9804200494, 40.7193676554), (-46.4609945958, 30.3667257165))
            Line((-46.4609945958, 30.3667257165), (-50.5820324143, 29.8202212158))
            Line((-50.5820324143, 29.8202212158), (-50.2755178366, 28.006735892))
            Line((-50.2755178366, 28.006735892), (-45.7521782087, 28.4818015615))
            ThreePointArc((-45.7521782087, 28.4818015615), (-35.6964434395, 38.9289042288), (-21.5694110126, 42.1979577158))
            ThreePointArc((-21.5694110126, 42.1979577158), (-7.5677131963, 38.4280486782), (2.1097264253, 27.6295803487))
            Line((2.1097264253, 27.6295803487), (6.6132862121, 26.9937831908))
            Line((6.6132862121, 26.9937831908), (6.9841672666, 28.7952069193))
        make_face()
        Polygon((0.65387832, 14.6969654201), (-6.4288745034, 14.6969654201), (-3.8528503315, 11.8698262972), (-6.6017220804, 9.8448265344), (0.65387832, 9.8448265344), align=None)
        Polygon((-40.3544344008, 12.5197675079), (-37.679395917, 15.2534070716), (-44.7576590216, 15.5055557954), (-44.9303970315, 10.6564926543), (-37.679395917, 10.3981904904), align=None)
        Polygon((-3.8528503315, 11.8698262972), (-6.4288745034, 14.6969654201), (-9.0568310236, 12.0552075228), (-6.6017220804, 9.8448265344), align=None)
        Polygon((-35.1471528411, 12.5197675079), (-37.679395917, 15.2534070716), (-40.3544344008, 12.5197675079), (-37.679395917, 10.3981904904), align=None)
        with Locations((-16.7828049063, 4.3770501642)):
            Rectangle(F0_W, F0_H)
        Polygon((-25.3628130835, 3.5319078526), (-25.2947680263, 5.4420536208), (-30.0360304476, 5.6109514494), (-30.1040755048, 3.7008056811), align=None)
        with Locations((-9.8661344964, 4.5587262139)):
            Rectangle(F0_W_2, F0_H_2)
        Polygon((-32.2511469345, 4.1805909847), (-32.1988634885, 5.6482802973), (-36.9593330619, 5.8178623416), (-37.011616508, 4.350173029), align=None)
        with Locations((-3.7132945145, 4.7373422422)):
            Rectangle(F0_W_3, F0_H_3)
        Polygon((-38.7103855509, 4.6092761508), (-38.6595151567, 6.0372985872), (-42.7852563068, 6.1842697226), (-42.8361267011, 4.7562472863), align=None)
        Polygon((-14.72098995, 13.2589338481), (-16.3294348053, 11.8467019859), (-14.8276363188, 10.2651806109), (-13.2766810033, 11.7379538419), align=None)
        Polygon((-27.8865820009, 12.0524866506), (-29.4437312744, 13.5210845619), (-30.9412721545, 12.0524866506), (-29.4437312744, 10.525432397), align=None)
    extrude(amount=F1_DEPTH)


solid = f1.part
